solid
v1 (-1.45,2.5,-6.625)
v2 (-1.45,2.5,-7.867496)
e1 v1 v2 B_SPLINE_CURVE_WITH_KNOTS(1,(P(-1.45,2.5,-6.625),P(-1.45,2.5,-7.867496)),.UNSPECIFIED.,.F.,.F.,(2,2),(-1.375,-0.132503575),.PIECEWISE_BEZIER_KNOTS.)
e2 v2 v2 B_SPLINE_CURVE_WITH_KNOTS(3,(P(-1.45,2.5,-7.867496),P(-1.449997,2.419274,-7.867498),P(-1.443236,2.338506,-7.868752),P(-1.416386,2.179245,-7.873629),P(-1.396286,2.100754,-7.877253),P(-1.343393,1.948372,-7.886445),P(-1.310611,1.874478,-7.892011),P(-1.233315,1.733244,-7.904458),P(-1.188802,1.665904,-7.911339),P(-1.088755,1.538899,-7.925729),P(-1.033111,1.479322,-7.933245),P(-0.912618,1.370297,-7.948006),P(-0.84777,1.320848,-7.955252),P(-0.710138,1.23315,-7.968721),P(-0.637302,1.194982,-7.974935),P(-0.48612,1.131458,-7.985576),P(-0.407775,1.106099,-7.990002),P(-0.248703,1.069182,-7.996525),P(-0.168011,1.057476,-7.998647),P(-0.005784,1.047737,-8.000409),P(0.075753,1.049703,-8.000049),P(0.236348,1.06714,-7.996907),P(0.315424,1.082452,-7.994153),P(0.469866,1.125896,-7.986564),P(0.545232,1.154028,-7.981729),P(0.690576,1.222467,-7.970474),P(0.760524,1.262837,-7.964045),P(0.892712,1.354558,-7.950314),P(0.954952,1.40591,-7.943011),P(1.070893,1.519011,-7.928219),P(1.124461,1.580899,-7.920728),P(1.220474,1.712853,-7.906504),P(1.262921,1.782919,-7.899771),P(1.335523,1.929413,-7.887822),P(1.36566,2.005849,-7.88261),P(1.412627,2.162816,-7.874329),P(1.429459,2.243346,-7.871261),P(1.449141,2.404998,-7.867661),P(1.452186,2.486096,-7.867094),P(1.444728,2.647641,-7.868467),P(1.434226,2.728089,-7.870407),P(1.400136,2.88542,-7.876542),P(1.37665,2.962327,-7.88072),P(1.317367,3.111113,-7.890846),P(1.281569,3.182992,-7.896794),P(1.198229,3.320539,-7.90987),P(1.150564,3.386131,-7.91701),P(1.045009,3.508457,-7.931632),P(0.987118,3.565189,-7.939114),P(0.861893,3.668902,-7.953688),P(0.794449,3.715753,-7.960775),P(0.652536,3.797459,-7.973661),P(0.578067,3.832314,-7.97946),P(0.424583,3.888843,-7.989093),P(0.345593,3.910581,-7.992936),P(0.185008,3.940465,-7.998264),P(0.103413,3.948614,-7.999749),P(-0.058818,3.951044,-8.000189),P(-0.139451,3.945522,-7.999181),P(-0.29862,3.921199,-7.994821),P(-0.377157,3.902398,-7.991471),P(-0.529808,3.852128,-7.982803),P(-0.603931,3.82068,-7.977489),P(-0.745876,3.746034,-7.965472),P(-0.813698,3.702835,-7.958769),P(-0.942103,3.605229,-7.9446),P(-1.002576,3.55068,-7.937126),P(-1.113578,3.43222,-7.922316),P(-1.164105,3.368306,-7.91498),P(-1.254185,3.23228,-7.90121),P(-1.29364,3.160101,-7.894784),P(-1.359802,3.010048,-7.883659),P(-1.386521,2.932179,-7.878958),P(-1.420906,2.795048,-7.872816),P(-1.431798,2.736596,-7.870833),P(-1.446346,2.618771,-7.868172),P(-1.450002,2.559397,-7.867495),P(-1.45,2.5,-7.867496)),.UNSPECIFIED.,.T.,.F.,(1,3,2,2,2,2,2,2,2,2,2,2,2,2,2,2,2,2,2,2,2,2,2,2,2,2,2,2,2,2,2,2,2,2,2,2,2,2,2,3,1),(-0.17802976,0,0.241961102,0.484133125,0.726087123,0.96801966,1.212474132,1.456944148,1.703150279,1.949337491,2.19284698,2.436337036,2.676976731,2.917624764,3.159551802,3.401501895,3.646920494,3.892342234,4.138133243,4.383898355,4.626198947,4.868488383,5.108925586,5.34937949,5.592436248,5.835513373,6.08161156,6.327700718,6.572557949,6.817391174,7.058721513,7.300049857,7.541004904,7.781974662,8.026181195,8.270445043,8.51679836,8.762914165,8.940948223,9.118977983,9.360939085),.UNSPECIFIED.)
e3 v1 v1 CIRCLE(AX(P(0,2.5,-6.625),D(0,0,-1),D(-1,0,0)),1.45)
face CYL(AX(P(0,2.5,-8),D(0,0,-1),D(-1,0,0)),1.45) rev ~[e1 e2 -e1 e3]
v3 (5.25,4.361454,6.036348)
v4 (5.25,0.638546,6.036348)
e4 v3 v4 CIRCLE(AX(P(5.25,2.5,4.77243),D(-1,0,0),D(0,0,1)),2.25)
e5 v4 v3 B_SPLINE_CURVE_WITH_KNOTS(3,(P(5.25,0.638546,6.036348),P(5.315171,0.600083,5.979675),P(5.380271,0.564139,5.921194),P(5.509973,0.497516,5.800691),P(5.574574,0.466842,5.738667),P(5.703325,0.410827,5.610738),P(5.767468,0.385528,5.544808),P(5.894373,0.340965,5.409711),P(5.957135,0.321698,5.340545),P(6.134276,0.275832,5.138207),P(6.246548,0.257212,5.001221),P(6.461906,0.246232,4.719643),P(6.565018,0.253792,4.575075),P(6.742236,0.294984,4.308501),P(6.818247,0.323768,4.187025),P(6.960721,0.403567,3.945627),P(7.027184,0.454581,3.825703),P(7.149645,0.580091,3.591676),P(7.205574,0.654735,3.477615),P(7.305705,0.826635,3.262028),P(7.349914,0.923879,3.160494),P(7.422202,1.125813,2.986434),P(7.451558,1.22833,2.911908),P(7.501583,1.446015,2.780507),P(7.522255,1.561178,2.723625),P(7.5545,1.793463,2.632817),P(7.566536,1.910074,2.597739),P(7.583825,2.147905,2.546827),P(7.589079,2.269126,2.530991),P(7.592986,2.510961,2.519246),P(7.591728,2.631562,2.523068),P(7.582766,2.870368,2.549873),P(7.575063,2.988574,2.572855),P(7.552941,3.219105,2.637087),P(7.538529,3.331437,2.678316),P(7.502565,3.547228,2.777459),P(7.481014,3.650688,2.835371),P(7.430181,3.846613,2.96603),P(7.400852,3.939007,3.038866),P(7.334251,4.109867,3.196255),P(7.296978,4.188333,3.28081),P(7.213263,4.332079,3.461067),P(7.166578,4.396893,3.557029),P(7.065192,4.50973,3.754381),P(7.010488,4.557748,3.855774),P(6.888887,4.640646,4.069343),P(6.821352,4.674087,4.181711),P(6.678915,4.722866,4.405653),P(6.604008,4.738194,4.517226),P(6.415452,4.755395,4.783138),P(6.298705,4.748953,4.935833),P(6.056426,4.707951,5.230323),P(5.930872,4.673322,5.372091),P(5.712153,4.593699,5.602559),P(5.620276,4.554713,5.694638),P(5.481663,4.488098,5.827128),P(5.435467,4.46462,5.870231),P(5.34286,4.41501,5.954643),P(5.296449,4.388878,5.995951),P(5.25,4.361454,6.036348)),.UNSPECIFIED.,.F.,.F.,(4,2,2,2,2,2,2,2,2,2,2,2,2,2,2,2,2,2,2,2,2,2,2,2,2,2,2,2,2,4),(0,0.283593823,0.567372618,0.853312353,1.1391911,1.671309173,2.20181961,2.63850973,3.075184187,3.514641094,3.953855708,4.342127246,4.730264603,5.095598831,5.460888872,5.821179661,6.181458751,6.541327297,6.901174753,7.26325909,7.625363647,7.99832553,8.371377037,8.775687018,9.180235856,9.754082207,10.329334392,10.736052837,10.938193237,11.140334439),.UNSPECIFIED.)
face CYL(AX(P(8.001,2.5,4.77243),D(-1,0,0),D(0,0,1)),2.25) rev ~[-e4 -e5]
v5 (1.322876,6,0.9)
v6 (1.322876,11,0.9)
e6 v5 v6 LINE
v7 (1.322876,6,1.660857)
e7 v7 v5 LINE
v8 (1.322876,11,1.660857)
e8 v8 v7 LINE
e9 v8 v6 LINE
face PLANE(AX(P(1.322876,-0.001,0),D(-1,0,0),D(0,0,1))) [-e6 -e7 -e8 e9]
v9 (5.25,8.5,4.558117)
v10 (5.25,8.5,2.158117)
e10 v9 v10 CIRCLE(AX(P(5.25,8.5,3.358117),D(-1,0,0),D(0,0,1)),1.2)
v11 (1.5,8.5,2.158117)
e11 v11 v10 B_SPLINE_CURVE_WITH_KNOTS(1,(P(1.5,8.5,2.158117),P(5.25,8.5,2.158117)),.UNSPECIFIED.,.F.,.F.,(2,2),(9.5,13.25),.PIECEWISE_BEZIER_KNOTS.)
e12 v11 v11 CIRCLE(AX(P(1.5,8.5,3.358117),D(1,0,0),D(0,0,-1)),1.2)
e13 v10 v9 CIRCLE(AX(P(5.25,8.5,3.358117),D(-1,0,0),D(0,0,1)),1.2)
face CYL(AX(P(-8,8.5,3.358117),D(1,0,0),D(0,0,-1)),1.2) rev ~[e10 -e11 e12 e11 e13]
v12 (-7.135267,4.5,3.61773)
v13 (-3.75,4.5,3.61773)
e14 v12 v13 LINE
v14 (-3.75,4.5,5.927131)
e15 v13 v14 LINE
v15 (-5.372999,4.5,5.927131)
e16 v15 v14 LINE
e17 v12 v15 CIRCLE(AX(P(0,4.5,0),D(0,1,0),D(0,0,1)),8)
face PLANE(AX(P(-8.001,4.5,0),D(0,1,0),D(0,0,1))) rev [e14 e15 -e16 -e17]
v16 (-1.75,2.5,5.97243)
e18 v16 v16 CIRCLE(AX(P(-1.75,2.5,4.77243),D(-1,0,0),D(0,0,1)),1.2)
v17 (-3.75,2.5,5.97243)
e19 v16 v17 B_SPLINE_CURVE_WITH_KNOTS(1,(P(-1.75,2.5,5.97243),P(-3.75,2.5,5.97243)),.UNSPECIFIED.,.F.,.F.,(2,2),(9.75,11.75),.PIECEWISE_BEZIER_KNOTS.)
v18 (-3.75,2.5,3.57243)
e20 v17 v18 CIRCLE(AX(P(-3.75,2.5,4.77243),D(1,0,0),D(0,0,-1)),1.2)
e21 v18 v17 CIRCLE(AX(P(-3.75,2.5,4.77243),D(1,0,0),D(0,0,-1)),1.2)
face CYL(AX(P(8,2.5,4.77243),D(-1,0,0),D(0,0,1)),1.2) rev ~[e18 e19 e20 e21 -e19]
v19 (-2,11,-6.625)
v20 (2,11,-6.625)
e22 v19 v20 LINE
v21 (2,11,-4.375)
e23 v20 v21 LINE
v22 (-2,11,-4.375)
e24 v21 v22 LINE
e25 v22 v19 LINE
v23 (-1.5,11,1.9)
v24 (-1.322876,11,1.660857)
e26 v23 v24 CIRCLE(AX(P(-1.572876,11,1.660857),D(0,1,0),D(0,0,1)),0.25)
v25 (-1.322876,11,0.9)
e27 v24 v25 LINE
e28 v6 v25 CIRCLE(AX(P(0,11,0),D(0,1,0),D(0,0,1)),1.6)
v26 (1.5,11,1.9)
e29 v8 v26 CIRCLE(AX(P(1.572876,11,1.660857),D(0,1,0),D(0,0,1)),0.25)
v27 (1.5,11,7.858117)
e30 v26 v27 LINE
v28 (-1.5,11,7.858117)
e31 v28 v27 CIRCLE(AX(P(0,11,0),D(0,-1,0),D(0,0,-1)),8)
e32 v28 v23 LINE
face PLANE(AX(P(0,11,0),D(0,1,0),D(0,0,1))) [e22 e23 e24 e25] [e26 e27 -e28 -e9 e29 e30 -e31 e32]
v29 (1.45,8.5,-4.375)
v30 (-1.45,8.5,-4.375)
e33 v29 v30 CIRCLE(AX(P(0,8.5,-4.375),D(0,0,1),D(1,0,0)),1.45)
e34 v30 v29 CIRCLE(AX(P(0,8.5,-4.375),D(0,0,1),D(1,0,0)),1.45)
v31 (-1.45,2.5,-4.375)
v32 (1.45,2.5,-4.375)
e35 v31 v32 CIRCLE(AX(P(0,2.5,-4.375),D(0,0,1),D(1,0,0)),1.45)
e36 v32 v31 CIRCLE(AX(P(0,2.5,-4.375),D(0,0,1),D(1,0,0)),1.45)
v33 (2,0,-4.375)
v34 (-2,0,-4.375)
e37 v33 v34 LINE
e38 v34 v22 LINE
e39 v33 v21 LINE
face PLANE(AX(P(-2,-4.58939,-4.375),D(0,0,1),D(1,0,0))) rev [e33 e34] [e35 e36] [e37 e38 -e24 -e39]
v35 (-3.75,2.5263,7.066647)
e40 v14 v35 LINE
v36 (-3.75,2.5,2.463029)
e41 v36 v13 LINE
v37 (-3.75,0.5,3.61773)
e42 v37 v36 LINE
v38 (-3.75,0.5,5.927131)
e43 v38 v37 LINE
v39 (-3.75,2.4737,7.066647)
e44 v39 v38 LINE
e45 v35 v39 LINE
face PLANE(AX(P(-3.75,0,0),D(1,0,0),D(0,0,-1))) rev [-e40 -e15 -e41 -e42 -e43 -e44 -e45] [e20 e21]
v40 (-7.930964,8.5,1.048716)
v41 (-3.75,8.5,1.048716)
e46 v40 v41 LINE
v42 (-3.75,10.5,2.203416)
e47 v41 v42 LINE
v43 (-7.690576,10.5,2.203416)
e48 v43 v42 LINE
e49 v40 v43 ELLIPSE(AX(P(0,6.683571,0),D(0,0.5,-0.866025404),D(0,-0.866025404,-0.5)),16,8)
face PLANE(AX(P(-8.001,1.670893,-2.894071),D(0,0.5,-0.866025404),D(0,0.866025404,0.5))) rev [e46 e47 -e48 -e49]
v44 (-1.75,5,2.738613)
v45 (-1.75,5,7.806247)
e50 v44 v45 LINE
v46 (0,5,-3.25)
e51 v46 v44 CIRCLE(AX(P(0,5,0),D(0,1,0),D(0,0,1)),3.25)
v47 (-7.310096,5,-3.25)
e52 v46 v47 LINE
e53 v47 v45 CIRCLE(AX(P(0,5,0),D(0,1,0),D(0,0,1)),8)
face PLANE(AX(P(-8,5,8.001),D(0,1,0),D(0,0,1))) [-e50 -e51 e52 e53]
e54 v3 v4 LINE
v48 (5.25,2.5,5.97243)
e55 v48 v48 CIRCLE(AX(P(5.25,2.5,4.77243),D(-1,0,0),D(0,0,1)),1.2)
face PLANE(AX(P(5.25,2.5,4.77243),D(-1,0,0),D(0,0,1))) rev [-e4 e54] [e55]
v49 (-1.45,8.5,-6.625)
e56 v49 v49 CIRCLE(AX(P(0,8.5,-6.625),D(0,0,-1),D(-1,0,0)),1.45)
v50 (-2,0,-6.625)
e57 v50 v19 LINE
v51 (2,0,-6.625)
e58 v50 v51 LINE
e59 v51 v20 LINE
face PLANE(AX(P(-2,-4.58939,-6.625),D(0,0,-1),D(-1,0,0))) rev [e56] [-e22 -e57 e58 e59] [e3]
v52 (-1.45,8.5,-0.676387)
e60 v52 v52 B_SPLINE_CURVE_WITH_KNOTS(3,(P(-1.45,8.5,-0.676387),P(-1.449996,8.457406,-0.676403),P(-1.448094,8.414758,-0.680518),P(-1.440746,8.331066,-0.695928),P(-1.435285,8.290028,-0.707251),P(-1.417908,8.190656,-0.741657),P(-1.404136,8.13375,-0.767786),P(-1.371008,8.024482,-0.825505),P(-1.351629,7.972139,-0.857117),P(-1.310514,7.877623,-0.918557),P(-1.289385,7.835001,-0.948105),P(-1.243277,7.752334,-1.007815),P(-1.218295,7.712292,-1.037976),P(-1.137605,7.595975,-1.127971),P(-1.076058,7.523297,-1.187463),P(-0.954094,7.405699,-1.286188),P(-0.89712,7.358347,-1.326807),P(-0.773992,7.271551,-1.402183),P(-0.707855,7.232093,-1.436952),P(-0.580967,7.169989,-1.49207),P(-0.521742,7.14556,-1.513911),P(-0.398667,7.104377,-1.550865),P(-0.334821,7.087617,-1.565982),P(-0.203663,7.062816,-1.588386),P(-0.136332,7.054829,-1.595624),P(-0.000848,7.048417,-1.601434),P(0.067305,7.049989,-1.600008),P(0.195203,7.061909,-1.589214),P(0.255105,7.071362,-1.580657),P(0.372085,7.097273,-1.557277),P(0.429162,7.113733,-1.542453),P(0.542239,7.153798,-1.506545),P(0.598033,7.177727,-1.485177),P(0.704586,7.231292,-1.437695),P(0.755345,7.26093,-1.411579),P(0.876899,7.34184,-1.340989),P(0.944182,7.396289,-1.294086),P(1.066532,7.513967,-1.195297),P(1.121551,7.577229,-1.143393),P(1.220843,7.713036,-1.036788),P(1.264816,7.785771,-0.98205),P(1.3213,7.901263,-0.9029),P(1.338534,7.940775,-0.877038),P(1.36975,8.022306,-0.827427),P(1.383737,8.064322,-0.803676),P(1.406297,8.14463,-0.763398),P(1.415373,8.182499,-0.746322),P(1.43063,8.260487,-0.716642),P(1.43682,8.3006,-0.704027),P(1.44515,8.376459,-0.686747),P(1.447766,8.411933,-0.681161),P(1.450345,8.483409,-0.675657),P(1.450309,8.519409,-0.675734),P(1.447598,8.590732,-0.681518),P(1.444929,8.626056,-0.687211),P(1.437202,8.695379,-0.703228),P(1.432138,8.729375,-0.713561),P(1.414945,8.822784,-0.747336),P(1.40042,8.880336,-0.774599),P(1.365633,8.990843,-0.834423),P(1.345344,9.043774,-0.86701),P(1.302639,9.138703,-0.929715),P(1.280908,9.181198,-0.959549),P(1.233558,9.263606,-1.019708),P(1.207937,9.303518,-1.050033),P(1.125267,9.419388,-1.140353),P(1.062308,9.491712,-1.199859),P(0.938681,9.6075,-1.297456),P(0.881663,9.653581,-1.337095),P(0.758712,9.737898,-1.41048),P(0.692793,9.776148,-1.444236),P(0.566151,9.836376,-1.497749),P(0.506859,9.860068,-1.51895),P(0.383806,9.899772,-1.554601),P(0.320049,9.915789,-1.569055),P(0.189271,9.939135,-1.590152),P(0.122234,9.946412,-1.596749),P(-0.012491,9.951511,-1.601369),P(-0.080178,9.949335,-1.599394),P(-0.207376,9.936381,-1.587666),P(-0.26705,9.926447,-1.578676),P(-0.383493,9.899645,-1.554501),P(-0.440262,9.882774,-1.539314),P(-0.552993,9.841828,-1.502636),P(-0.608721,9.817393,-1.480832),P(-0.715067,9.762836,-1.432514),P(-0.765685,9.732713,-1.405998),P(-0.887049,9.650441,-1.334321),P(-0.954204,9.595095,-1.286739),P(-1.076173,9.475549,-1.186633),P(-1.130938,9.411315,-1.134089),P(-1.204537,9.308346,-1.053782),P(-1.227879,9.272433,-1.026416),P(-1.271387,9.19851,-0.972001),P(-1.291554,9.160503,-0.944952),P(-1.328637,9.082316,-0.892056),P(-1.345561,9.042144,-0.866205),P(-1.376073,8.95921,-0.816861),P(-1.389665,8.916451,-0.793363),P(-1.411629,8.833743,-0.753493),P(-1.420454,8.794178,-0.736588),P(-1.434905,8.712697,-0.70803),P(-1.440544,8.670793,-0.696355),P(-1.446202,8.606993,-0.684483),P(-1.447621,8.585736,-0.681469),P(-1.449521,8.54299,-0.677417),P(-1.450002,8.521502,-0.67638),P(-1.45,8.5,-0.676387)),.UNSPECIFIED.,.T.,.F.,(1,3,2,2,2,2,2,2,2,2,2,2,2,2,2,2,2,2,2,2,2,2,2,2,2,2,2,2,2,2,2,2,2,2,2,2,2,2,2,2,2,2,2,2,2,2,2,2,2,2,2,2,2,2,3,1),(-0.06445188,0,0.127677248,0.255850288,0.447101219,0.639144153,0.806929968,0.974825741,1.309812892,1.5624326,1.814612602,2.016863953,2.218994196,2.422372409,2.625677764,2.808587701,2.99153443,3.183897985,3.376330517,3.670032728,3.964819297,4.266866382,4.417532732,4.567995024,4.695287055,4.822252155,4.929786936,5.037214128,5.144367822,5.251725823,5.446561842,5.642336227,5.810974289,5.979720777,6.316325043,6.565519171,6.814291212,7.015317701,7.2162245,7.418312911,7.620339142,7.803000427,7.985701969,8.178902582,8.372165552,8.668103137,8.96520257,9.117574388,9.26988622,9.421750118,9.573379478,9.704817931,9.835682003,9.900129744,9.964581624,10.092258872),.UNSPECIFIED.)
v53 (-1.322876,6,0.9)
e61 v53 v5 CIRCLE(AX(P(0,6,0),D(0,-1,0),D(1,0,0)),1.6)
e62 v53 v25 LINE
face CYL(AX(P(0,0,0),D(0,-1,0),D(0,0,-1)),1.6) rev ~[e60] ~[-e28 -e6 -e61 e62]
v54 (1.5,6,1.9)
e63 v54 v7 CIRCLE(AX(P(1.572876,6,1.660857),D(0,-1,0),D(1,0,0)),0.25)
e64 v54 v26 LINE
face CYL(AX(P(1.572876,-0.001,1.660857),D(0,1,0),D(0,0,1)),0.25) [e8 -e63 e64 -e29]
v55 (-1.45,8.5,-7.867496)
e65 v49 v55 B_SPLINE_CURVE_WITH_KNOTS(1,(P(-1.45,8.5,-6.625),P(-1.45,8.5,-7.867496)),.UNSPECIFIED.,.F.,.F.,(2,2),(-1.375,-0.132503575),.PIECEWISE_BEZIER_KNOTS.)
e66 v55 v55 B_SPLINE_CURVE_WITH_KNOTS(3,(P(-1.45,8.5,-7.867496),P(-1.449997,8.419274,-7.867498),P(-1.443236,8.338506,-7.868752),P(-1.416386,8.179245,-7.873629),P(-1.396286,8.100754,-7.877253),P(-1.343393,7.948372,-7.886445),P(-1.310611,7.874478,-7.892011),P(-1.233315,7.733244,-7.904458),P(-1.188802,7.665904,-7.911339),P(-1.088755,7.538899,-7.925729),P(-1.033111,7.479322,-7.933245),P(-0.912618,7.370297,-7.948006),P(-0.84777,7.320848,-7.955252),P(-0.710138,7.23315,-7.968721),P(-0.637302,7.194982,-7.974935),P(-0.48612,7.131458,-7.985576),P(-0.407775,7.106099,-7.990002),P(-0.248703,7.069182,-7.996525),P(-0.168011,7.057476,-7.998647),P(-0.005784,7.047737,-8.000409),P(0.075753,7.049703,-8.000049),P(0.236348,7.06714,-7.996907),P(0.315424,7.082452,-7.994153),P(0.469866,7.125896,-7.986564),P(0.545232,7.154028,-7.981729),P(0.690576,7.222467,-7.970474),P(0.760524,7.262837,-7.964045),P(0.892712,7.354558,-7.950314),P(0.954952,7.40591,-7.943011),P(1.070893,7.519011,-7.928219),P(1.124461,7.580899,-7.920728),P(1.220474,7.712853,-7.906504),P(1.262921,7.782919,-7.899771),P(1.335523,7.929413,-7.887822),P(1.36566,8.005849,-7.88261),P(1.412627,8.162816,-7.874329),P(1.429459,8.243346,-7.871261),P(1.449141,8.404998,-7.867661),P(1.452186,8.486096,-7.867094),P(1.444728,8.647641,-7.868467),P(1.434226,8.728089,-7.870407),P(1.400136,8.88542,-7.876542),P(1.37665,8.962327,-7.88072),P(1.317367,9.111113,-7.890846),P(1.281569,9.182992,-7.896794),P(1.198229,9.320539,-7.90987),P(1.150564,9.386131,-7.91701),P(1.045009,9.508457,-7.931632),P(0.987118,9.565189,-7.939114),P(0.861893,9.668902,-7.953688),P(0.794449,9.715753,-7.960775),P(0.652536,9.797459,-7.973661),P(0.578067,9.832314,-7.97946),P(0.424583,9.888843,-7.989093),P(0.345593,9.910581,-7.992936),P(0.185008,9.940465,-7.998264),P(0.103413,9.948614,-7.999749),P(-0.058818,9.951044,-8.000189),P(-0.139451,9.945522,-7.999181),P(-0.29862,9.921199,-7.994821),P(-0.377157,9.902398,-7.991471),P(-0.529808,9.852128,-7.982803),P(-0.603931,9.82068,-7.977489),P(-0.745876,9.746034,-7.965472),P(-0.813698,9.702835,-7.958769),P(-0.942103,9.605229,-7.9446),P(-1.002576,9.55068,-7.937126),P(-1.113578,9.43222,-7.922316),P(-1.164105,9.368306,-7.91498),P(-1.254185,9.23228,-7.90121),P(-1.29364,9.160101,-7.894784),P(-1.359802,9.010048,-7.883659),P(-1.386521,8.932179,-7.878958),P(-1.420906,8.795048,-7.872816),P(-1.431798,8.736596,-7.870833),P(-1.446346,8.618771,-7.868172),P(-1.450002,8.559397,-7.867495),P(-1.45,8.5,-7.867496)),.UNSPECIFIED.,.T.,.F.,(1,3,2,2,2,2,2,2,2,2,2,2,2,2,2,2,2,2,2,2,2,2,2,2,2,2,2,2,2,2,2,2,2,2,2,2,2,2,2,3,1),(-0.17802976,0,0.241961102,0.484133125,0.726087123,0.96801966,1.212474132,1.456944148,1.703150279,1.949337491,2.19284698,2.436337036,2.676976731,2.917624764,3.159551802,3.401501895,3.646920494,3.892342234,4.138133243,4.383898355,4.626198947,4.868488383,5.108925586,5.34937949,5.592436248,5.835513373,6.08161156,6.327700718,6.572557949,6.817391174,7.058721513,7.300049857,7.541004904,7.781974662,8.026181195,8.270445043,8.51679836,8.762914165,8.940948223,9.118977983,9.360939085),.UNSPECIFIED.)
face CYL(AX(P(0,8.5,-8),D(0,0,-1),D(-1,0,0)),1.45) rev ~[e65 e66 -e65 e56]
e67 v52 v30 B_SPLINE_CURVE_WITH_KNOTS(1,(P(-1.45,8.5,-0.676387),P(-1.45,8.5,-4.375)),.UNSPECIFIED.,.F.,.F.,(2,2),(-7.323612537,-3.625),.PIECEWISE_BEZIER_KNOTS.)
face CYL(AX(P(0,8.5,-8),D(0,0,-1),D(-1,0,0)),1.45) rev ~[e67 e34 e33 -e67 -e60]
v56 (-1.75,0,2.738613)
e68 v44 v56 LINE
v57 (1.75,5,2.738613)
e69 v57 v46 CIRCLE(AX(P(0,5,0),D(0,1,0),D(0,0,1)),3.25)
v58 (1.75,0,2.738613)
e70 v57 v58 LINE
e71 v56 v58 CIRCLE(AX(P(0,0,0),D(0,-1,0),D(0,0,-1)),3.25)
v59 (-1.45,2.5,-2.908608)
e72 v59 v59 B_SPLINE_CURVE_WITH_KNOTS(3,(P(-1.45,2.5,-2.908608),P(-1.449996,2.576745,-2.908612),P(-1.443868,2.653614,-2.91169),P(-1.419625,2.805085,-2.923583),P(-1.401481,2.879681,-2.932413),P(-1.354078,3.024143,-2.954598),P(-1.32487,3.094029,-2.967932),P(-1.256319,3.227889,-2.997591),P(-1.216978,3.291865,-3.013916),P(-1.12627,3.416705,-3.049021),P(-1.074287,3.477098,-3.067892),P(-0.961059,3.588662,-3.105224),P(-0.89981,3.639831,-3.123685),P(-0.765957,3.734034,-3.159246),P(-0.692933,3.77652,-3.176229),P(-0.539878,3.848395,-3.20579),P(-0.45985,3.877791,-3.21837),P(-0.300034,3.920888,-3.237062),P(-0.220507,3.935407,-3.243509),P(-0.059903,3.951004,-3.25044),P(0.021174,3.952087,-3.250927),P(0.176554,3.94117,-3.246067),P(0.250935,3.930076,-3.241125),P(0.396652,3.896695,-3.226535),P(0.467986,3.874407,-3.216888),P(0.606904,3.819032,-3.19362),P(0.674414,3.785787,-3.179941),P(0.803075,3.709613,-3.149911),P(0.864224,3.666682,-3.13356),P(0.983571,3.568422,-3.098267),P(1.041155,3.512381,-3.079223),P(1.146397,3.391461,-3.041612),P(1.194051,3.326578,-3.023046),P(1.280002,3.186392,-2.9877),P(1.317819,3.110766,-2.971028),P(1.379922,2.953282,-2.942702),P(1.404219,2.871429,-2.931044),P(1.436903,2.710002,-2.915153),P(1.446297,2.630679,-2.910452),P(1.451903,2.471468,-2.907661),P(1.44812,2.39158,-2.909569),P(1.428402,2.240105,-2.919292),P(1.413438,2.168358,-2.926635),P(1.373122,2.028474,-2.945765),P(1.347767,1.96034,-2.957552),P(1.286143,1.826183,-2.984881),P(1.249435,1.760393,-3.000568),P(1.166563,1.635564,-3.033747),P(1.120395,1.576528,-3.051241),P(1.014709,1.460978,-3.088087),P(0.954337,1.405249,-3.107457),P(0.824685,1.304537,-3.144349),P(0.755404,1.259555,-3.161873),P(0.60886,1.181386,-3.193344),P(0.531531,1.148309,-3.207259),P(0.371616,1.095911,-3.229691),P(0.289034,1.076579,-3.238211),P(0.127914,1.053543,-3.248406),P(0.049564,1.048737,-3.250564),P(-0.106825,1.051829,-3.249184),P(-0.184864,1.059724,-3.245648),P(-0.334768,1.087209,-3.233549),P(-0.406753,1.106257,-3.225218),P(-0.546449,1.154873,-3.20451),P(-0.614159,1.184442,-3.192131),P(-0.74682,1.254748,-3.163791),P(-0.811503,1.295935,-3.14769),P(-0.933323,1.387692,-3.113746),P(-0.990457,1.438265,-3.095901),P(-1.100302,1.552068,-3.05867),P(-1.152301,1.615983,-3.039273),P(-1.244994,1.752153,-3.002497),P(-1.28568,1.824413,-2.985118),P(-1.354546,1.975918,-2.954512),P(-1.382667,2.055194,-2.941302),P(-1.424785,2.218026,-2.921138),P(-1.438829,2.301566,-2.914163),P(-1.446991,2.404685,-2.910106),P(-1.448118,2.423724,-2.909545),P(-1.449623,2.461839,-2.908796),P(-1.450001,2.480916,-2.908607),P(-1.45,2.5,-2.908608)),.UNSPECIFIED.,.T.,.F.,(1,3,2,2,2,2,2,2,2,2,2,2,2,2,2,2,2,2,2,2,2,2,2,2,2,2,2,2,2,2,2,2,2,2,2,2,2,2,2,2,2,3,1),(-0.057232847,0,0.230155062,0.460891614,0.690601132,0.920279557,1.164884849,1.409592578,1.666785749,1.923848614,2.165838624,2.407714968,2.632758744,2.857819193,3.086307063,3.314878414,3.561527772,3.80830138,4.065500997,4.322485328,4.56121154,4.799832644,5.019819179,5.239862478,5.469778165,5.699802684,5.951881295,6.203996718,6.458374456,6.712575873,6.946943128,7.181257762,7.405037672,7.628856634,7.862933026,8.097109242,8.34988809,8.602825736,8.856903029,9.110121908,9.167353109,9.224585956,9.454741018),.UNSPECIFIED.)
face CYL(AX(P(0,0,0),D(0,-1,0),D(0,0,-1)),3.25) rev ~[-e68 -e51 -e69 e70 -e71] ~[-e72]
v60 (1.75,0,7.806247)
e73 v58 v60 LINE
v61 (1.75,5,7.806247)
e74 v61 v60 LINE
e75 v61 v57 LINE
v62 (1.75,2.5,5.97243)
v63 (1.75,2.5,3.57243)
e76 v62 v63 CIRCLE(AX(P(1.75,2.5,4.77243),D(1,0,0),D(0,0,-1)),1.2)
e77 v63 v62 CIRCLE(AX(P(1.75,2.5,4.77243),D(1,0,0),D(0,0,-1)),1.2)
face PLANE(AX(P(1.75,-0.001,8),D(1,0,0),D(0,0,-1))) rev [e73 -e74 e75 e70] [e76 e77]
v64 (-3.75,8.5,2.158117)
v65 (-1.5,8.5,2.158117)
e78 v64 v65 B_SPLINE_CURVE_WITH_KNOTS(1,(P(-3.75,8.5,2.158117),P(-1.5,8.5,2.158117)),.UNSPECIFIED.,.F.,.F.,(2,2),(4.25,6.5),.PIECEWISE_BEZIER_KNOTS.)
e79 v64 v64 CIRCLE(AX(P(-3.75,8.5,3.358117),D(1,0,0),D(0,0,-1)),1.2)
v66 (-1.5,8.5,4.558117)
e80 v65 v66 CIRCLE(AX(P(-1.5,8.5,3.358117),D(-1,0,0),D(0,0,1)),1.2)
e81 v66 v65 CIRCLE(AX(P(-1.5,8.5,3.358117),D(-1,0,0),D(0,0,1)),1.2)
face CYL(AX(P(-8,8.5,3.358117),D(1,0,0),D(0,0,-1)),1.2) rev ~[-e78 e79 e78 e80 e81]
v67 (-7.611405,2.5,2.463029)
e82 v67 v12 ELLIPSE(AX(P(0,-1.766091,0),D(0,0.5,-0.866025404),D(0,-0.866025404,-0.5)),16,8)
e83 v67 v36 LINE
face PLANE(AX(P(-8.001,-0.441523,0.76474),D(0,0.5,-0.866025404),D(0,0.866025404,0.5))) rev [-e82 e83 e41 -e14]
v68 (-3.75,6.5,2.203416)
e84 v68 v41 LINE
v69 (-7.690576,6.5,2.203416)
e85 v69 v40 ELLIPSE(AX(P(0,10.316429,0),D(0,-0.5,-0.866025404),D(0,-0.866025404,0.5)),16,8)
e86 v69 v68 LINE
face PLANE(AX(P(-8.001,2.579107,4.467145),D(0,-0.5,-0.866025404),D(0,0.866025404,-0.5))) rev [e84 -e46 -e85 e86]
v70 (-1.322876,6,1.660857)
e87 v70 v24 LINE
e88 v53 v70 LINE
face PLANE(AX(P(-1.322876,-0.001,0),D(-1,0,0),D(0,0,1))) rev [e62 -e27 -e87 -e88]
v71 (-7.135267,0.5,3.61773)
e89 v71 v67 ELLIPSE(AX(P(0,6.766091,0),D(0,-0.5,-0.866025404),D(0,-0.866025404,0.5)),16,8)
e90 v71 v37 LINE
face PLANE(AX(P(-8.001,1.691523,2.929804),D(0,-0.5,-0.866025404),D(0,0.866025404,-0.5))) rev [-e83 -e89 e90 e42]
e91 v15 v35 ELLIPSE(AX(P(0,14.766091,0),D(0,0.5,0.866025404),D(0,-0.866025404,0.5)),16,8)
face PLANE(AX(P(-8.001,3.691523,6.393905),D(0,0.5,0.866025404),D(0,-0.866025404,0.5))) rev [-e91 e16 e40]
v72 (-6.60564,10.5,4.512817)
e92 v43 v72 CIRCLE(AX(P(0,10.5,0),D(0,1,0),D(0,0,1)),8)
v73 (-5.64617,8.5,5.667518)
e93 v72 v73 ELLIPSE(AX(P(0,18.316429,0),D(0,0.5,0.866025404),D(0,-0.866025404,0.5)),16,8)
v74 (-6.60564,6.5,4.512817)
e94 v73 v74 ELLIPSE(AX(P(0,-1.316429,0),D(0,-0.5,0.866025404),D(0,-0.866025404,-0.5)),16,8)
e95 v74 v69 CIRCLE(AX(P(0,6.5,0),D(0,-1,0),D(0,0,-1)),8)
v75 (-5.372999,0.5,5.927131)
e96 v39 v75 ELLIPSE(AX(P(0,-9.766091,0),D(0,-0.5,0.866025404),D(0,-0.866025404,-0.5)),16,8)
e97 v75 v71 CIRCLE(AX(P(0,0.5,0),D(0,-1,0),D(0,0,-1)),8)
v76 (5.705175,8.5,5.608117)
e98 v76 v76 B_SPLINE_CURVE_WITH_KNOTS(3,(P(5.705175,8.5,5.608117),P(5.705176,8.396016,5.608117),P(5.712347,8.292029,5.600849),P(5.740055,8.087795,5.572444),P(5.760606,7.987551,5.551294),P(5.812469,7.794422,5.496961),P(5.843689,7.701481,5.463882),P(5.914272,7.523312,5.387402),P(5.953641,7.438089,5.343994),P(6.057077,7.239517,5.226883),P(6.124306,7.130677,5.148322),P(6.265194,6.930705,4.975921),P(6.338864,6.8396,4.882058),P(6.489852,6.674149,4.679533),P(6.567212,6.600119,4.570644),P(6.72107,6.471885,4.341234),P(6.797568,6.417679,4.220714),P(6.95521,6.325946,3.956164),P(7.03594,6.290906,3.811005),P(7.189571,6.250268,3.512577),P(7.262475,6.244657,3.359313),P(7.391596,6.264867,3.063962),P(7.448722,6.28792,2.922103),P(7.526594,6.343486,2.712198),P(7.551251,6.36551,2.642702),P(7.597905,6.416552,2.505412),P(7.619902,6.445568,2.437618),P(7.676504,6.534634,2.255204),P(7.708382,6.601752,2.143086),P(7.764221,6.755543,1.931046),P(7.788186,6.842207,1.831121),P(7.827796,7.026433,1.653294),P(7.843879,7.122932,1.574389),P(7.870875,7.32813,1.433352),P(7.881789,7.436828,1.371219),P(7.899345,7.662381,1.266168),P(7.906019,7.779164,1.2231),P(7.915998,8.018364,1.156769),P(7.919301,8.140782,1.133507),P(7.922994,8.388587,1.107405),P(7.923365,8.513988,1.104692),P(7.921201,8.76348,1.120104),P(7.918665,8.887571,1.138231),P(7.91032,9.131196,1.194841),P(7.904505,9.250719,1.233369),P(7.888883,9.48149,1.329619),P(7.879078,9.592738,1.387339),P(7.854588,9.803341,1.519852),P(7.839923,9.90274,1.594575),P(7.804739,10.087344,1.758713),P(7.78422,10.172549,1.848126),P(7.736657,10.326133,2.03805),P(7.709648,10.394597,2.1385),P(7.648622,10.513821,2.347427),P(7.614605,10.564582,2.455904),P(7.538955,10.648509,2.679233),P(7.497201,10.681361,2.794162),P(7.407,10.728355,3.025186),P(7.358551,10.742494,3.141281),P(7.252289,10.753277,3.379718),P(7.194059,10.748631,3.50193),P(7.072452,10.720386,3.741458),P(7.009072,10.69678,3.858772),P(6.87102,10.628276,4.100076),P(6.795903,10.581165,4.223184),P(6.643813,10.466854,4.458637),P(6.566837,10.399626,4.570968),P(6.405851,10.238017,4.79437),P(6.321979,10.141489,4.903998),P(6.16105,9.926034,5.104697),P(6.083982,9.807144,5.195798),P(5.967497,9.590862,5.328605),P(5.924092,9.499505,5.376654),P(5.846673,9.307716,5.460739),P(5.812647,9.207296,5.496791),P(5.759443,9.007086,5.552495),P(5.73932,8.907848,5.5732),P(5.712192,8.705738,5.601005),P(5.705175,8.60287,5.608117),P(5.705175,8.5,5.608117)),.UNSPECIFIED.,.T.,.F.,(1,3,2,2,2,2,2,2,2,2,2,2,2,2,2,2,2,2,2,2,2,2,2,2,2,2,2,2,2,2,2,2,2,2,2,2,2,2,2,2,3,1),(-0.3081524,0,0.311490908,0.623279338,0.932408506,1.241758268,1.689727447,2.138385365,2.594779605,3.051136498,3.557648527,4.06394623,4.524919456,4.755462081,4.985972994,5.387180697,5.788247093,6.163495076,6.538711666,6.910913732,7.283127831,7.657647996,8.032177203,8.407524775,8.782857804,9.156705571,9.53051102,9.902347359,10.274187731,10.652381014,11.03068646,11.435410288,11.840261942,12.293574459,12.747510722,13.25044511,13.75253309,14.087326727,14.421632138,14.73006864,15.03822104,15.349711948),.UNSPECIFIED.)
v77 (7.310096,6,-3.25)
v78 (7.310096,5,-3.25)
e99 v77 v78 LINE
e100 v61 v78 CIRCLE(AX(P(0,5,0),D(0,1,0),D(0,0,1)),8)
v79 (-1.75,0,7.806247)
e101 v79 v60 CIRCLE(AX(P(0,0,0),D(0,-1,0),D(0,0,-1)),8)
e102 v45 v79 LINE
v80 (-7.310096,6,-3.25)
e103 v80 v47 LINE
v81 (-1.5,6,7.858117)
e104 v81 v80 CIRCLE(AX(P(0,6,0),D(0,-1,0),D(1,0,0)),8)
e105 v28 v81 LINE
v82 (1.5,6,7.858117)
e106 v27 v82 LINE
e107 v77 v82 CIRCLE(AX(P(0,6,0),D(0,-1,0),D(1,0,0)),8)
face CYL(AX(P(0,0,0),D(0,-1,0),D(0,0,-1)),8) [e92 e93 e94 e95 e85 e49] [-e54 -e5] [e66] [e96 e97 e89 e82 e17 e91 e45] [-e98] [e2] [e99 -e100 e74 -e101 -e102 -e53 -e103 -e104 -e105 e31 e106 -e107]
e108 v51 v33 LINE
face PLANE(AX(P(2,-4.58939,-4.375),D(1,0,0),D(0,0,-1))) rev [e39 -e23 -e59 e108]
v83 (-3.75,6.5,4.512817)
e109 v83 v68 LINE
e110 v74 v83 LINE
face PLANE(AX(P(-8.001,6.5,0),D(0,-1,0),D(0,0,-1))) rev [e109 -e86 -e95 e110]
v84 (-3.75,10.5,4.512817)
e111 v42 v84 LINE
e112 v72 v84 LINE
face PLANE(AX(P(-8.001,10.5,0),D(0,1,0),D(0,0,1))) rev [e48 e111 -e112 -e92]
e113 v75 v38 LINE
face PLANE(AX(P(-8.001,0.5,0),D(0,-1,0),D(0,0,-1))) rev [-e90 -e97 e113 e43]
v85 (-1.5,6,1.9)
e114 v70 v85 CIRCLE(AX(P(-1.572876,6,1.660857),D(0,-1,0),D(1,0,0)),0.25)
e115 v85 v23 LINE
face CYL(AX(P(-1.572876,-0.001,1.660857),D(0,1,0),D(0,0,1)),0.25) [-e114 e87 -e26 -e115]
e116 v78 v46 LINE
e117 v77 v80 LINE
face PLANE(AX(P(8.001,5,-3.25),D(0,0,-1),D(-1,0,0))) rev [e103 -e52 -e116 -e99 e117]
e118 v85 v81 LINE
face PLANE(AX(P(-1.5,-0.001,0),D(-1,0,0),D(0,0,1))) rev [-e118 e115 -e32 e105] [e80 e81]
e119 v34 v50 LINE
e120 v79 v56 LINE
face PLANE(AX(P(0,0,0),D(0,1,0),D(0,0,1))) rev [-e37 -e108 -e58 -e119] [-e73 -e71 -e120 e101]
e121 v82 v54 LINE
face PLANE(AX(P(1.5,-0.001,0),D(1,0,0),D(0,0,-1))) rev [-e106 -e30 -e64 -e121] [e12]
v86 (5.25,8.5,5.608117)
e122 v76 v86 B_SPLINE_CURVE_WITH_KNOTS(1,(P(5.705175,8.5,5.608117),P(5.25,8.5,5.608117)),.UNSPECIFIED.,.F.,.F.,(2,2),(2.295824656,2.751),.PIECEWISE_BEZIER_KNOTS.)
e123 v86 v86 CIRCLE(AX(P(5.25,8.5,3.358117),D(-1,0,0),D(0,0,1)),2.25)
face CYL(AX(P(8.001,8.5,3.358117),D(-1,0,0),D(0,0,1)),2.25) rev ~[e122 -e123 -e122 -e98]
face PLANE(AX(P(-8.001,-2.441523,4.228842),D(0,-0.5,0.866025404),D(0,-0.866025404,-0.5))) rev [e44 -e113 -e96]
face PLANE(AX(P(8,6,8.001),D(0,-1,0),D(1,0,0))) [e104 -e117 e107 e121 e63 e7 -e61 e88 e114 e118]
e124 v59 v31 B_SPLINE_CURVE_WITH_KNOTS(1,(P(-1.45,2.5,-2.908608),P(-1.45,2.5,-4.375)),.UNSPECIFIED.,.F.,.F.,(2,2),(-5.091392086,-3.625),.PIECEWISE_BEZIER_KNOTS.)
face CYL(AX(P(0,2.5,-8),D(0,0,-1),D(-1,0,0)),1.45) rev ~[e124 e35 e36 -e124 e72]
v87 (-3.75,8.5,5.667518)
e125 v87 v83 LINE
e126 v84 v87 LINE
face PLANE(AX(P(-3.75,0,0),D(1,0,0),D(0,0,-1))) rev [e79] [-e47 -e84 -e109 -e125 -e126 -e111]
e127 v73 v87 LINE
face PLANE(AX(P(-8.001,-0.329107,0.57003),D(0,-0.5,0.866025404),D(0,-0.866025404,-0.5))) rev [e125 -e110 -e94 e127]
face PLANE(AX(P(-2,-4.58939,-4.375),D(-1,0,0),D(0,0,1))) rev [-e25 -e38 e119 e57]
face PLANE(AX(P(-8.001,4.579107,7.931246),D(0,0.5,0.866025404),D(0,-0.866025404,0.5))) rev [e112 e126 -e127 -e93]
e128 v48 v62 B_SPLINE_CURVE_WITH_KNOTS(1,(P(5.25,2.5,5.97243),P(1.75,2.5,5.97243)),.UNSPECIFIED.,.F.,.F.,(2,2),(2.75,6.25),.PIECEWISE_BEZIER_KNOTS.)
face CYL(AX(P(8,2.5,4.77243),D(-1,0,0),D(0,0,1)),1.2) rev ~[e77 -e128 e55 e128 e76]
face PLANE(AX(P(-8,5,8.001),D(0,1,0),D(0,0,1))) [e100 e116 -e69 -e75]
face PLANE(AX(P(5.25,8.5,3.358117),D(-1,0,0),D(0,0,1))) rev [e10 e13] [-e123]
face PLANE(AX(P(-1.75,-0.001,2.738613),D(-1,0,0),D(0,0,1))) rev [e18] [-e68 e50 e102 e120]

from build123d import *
from build123d.topology import SkipClean

# Parameters (mm, degrees)
SKETCH1_W                            = 4.75
SKETCH1_H                            = 7
FILLET1_R                            = 1
SKETCH16_W                           = 16
SKETCH16_H                           = 1
CUT_EXTRUDE5_DEPTH                   = 1
CUT_EXTRUDE5_DIRECTION_2_REACH       = 18.492
CUT_EXTRUDE6_REACH                   = 15.304
SKETCH17_W                           = 3.5
SKETCH17_H                           = 5.261387212
CUT_EXTRUDE7_DEPTH                   = 18.408690359
CUT_EXTRUDE7_DEPTH_BACK              = 18.408690359
SKETCH18_R                           = 1.2
CUT_EXTRUDE10_START                  = -6
SKETCH21_R                           = 1.6
CUT_EXTRUDE10_DEPTH                  = 6
CUT_EXTRUDE11_DEPTH                  = 18.26991621
CUT_EXTRUDE11_DEPTH_BACK             = 18.26991621
SKETCH22_R                           = 1.2
CUT_EXTRUDE9_REACH                   = 20.603
CUT_EXTRUDE9_END_RADIUS              = 8
SKETCH20_R                           = 1.2
CUT_EXTRUDE12_REACH                  = 21.585
SKETCH19_R                           = 2.25
CUT_EXTRUDE13_REACH                  = 21.585
CUT_EXTRUDE13_END_RADIUS             = 8
SKETCH24_R                           = 2.25
CUT_EXTRUDE14_REACH                  = 18.492
CUT_EXTRUDE14_END_RADIUS             = 8
SKETCH25_W                           = 2.25
SKETCH25_H                           = 1
CUT_EXTRUDE14_DIRECTION_2_REACH      = 18.492
CUT_EXTRUDE14_DIRECTION_2_END_RADIUS = 8
M2_5_CLEARANCE_HOLE1_D               = 2.9
M2_5_CLEARANCE_HOLE1_DEPTH           = 8.029752102
M2_5_CLEARANCE_HOLE1_TIP             = 0.871247898
CUT_EXTRUDE15_START                  = -12
SKETCH29_W                           = 4
SKETCH29_H                           = 2.25
CUT_EXTRUDE15_DEPTH                  = 12
FILLET3_R                            = 0.25
SKETCH30_R                           = 8
CUT_EXTRUDE19_DEPTH                  = 1
BOSS_EXTRUDE1_START                  = 1
BOSS_EXTRUDE1_DEPTH                  = 1


with BuildPart() as part:
    # Sketch1 → Revolve1 (revolve)
    with BuildSketch(Plane.XY, mode=Mode.PRIVATE) as revolve1_sk:
        with Locations((5.625, 3.5)):
            Rectangle(SKETCH1_W, SKETCH1_H)
    revolve(revolve1_sk.sketch.rotate(Axis((0, 0, 0), (0, 1, 0)), 90), axis=Axis((0, 0, 0), (0, 1, 0)))

    # Sketch1<3> → Revolve2 (revolve)
    with BuildSketch(Plane.XY, mode=Mode.PRIVATE) as revolve2_sk:
        Polygon((1.6, 7), (3.25, 7), (8, 7), (8, 12), (1.6, 12), align=None)
    revolve(revolve2_sk.sketch.rotate(Axis((0, 0, 0), (0, 1, 0)), 90), axis=Axis((0, 0, 0), (0, 1, 0)))

    # Fillet1
    fillet1_edges = [part.edges().sort_by_distance(p)[0] for p in [
        (0, 12, 8),
    ]]
    fillet(fillet1_edges, radius=FILLET1_R)

    # Sketch16 → Cut-Extrude5 (cut)
    with BuildSketch(Plane.XY):
        with Locations((0, 5.5)):
            Rectangle(SKETCH16_W, SKETCH16_H)
    extrude(amount=-CUT_EXTRUDE5_DEPTH, mode=Mode.SUBTRACT)

    # Sketch16 → Cut-Extrude5 direction 2 (cut, up to next)
    with BuildSketch(Plane.XY, mode=Mode.PRIVATE) as cut_extrude5_direction_2_sk1:
        with Locations((0, 5.5)):
            Rectangle(SKETCH16_W, SKETCH16_H)
    cut_extrude5_direction_2_tool1 = extrude(cut_extrude5_direction_2_sk1.sketch, amount=CUT_EXTRUDE5_DIRECTION_2_REACH, mode=Mode.PRIVATE) & part.part
    add(cut_extrude5_direction_2_tool1.solids().sort_by_distance((0, 5.5, 0))[0], mode=Mode.SUBTRACT)

    # Sketch17 → Cut-Extrude6 (cut, up to next)
    with BuildSketch(Plane(origin=(0, 5, 0), x_dir=(1, 0, 0), z_dir=(0, 1, 0)), mode=Mode.PRIVATE) as cut_extrude6_sk1:
        with Locations((0, -5.369306394)):
            Rectangle(SKETCH17_W, SKETCH17_H)
    cut_extrude6_tool1 = extrude(cut_extrude6_sk1.sketch, amount=-CUT_EXTRUDE6_REACH, mode=Mode.PRIVATE) & part.part
    add(cut_extrude6_tool1.solids().sort_by_distance((0, 5, 5.369306))[0], mode=Mode.SUBTRACT)

    # Sketch18 → Cut-Extrude7 (cut, two sides: drawn at the far end of the back side and taken through both)
    with BuildSketch(Plane.ZY.offset(-1.75).offset(-CUT_EXTRUDE7_DEPTH_BACK)):
        with Locations((4.772430143, 2.5)):
            Circle(SKETCH18_R)
    extrude(amount=CUT_EXTRUDE7_DEPTH + CUT_EXTRUDE7_DEPTH_BACK, mode=Mode.SUBTRACT)

    # Sketch21 → Cut-Extrude10 (cut)
    with BuildSketch(Plane(origin=(0, 12, 0), x_dir=(1, 0, 0), z_dir=(0, 1, 0)).offset(CUT_EXTRUDE10_START)):
        Circle(SKETCH21_R)
        Polygon((-1.5, -1.9), (-1.5, -11.891029443), (1.5, -11.891029443), (1.5, -1.9), (1.322875656, -1.9), (1.322875656, -0.9), (-1.322875656, -0.9), (-1.322875656, -1.9), align=None)
    extrude(amount=CUT_EXTRUDE10_DEPTH, mode=Mode.SUBTRACT)

    # Sketch22 → Cut-Extrude11 (cut, two sides: drawn at the far end of the back side and taken through both)
    with BuildSketch(Plane(origin=(-1.5, 0, 0), x_dir=(0, 0, -1), z_dir=(1, 0, 0)).offset(-CUT_EXTRUDE11_DEPTH_BACK)):
        with Locations((-3.358116823, 8.5)):
            Circle(SKETCH22_R)
    extrude(amount=CUT_EXTRUDE11_DEPTH + CUT_EXTRUDE11_DEPTH_BACK, mode=Mode.SUBTRACT)

    # Cut-Extrude9: up to this cylinder (the profile starts inside it)
    cut_extrude9_end = Plane(origin=(0, 5.9847245, 0), z_dir=(0, -1, 0)) * Cylinder(CUT_EXTRUDE9_END_RADIUS, 65.175449, mode=Mode.PRIVATE)
    # Sketch20 → Cut-Extrude9 (cut, up to the surface)
    with BuildSketch(Plane(origin=(-3.75, 0, 0), x_dir=(0, 0, -1), z_dir=(1, 0, 0)), mode=Mode.PRIVATE) as cut_extrude9_sk1:
        Polygon((-2.463029066, 2.5), (-3.617729604, 4.5), (-5.927130681, 4.5), (-7.08183122, 2.5), (-5.927130681, 0.5), (-3.617729604, 0.5), align=None)
    cut_extrude9_tool1 = extrude(cut_extrude9_sk1.sketch, amount=-CUT_EXTRUDE9_REACH, mode=Mode.PRIVATE) & cut_extrude9_end
    add(cut_extrude9_tool1.solids().sort_by_distance((-3.75, 2.5, 4.77243))[0], mode=Mode.SUBTRACT)
    # Sketch20 → Cut-Extrude9 (cut, up to the surface)
    with BuildSketch(Plane(origin=(-3.75, 0, 0), x_dir=(0, 0, -1), z_dir=(1, 0, 0)), mode=Mode.PRIVATE) as cut_extrude9_sk2:
        Polygon((-1.048715746, 8.5), (-2.203416284, 10.5), (-4.512817361, 10.5), (-5.6675179, 8.5), (-4.512817361, 6.5), (-2.203416284, 6.5), align=None)
        with Locations((-3.358116823, 8.5)):
            Circle(SKETCH20_R, mode=Mode.SUBTRACT)
    cut_extrude9_tool2 = extrude(cut_extrude9_sk2.sketch, amount=-CUT_EXTRUDE9_REACH, mode=Mode.PRIVATE) & cut_extrude9_end
    add(cut_extrude9_tool2.solids().sort_by_distance((-3.75, 9.469449, 1.678981))[0], mode=Mode.SUBTRACT)

    # Sketch19 → Cut-Extrude12 (cut, up to next)
    with BuildSketch(Plane.ZY.offset(-5.25), mode=Mode.PRIVATE) as cut_extrude12_sk1:
        with Locations((4.772430143, 2.5)):
            Circle(SKETCH19_R)
    cut_extrude12_tool1 = extrude(cut_extrude12_sk1.sketch, amount=-CUT_EXTRUDE12_REACH, mode=Mode.PRIVATE) & part.part
    add(cut_extrude12_tool1.solids().sort_by_distance((5.25, 2.5, 4.77243))[0], mode=Mode.SUBTRACT)

    # Cut-Extrude13: up to this cylinder (the profile starts inside it)
    cut_extrude13_end = Plane(origin=(0, 8.5, 0), z_dir=(0, -1, 0)) * Cylinder(CUT_EXTRUDE13_END_RADIUS, 60.17, mode=Mode.PRIVATE)
    # Sketch24 → Cut-Extrude13 (cut, up to the surface)
    with BuildSketch(Plane.ZY.offset(-5.25), mode=Mode.PRIVATE) as cut_extrude13_sk1:
        with Locations((3.358116823, 8.5)):
            Circle(SKETCH24_R)
    cut_extrude13_tool1 = extrude(cut_extrude13_sk1.sketch, amount=-CUT_EXTRUDE13_REACH, mode=Mode.PRIVATE) & cut_extrude13_end
    add(cut_extrude13_tool1.solids().sort_by_distance((5.25, 8.5, 3.358117))[0], mode=Mode.SUBTRACT)

    # Cut-Extrude14: up to this cylinder (the profile starts inside it)
    cut_extrude14_end = Plane(origin=(0, 5.5, 0), z_dir=(0, -1, 0)) * Cylinder(CUT_EXTRUDE14_END_RADIUS, 53.984, mode=Mode.PRIVATE)
    # Sketch25 → Cut-Extrude14 (cut, up to the surface)
    with BuildSketch(Plane.ZY, mode=Mode.PRIVATE) as cut_extrude14_sk1:
        with Locations((-2.125, 5.5)):
            Rectangle(SKETCH25_W, SKETCH25_H)
    cut_extrude14_tool1 = extrude(cut_extrude14_sk1.sketch, amount=-CUT_EXTRUDE14_REACH, mode=Mode.PRIVATE) & cut_extrude14_end
    add(cut_extrude14_tool1.solids().sort_by_distance((0, 5.5, -2.125))[0], mode=Mode.SUBTRACT)

    # Cut-Extrude14 direction 2: up to this cylinder (the profile starts inside it)
    cut_extrude14_direction_2_end = Plane(origin=(0, 5.5, 0), z_dir=(0, -1, 0)) * Cylinder(CUT_EXTRUDE14_DIRECTION_2_END_RADIUS, 53.984, mode=Mode.PRIVATE)
    # Sketch25 → Cut-Extrude14 direction 2 (cut, up to the surface)
    with BuildSketch(Plane.ZY, mode=Mode.PRIVATE) as cut_extrude14_direction_2_sk1:
        with Locations((-2.125, 5.5)):
            Rectangle(SKETCH25_W, SKETCH25_H)
    cut_extrude14_direction_2_tool1 = extrude(cut_extrude14_direction_2_sk1.sketch, amount=CUT_EXTRUDE14_DIRECTION_2_REACH, mode=Mode.PRIVATE) & cut_extrude14_direction_2_end
    add(cut_extrude14_direction_2_tool1.solids().sort_by_distance((0, 5.5, -2.125))[0], mode=Mode.SUBTRACT)

    # M2.5 Clearance Hole1
    with Locations(Plane(origin=(0, 0, -8), x_dir=(-1, 0, 0), z_dir=(0, 0, -1))):
        with Locations((0, 8.5), (0, 2.5)):
            Hole(M2_5_CLEARANCE_HOLE1_D / 2, depth=M2_5_CLEARANCE_HOLE1_DEPTH)
            with Locations((0, 0, -(M2_5_CLEARANCE_HOLE1_DEPTH + M2_5_CLEARANCE_HOLE1_TIP / 2))):  # 118° drill point
                Cone(0, M2_5_CLEARANCE_HOLE1_D / 2, M2_5_CLEARANCE_HOLE1_TIP, mode=Mode.SUBTRACT)

    # Sketch29 → Cut-Extrude15 (cut)
    with BuildSketch(Plane(origin=(0, 12, 0), x_dir=(1, 0, 0), z_dir=(0, 1, 0)).offset(CUT_EXTRUDE15_START)):
        with Locations((0, 5.5)):
            Rectangle(SKETCH29_W, SKETCH29_H)
    extrude(amount=CUT_EXTRUDE15_DEPTH, mode=Mode.SUBTRACT)

    # Fillet3
    # the kernel refuses this fillet: 0.25 mm, written as the material it takes off along each edge
    with BuildSketch(Plane(origin=(-1.322875656, 6.402143732, 1.9), x_dir=(-1, 0, 0), z_dir=(0, 1, 0))) as fillet3_piece_1:
        with BuildLine():
            CenterArc((0.25, -0.239142507), FILLET3_R, 106.94793725, 73.05206275)
            Line((0, -0.239142507), (-0.005, -0.239142507))
            Line((-0.005, -0.239142507), (-0.005, 0))
            Line((-0.005, 0), (0, 0.005))
            ThreePointArc((0, 0.005), (0.088562172, 0.005), (0.175666831, 0.00478285))
            Line((0.175666831, 0.00478285), (0.177124344, 0))
        make_face()
    extrude(amount=6.195712537, mode=Mode.SUBTRACT)
    with BuildSketch(Plane(origin=(1.322875656, 6.402143732, 1.9), x_dir=(1, 0, 0), z_dir=(0, 1, 0))) as fillet3_piece_2:
        with BuildLine():
            CenterArc((0.25, 0.239142507), FILLET3_R, 180, 73.05206275)
            Line((0, 0.239142507), (-0.005, 0.239142507))
            Line((-0.005, 0.239142507), (-0.005, 0))
            Line((-0.005, 0), (0, -0.005))
            ThreePointArc((0, -0.005), (0.088562172, -0.005), (0.175666831, -0.00478285))
            Line((0.175666831, -0.00478285), (0.177124344, 0))
        make_face()
    extrude(amount=6.195712537, mode=Mode.SUBTRACT)

    # Sketch30 → Cut-Extrude19 (cut)
    with BuildSketch(Plane(origin=(0, 12, 0), x_dir=(1, 0, 0), z_dir=(0, 1, 0))):
        Circle(SKETCH30_R)
    extrude(amount=-CUT_EXTRUDE19_DEPTH, mode=Mode.SUBTRACT)

    # Sketch31 → Boss-Extrude1 (add)
    with SkipClean():  # the faces are left unmerged after this step: merging them gives an invalid solid
        with BuildSketch(Plane.XZ.offset(-7).offset(BOSS_EXTRUDE1_START)):
            with BuildLine():
                Line((-1.322875656, 0.9), (-1.322875656, 1.660857493))
                ThreePointArc((-1.322875656, 1.660857493), (-1.371979023, 1.809654479), (-1.5, 1.9))
                Line((-1.5, 1.9), (-1.5, 2.883140649))
                ThreePointArc((-1.5, 2.883140649), (0, -3.25), (1.5, 2.883140649))
                Line((1.5, 2.883140649), (1.5, 1.9))
                ThreePointArc((1.5, 1.9), (1.371979023, 1.809654479), (1.322875656, 1.660857493))
                Line((1.322875656, 1.660857493), (1.322875656, 0.9))
                ThreePointArc((1.322875656, 0.9), (0, -1.6), (-1.322875656, 0.9))
            make_face()
        extrude(amount=-BOSS_EXTRUDE1_DEPTH)


solid = part.part
